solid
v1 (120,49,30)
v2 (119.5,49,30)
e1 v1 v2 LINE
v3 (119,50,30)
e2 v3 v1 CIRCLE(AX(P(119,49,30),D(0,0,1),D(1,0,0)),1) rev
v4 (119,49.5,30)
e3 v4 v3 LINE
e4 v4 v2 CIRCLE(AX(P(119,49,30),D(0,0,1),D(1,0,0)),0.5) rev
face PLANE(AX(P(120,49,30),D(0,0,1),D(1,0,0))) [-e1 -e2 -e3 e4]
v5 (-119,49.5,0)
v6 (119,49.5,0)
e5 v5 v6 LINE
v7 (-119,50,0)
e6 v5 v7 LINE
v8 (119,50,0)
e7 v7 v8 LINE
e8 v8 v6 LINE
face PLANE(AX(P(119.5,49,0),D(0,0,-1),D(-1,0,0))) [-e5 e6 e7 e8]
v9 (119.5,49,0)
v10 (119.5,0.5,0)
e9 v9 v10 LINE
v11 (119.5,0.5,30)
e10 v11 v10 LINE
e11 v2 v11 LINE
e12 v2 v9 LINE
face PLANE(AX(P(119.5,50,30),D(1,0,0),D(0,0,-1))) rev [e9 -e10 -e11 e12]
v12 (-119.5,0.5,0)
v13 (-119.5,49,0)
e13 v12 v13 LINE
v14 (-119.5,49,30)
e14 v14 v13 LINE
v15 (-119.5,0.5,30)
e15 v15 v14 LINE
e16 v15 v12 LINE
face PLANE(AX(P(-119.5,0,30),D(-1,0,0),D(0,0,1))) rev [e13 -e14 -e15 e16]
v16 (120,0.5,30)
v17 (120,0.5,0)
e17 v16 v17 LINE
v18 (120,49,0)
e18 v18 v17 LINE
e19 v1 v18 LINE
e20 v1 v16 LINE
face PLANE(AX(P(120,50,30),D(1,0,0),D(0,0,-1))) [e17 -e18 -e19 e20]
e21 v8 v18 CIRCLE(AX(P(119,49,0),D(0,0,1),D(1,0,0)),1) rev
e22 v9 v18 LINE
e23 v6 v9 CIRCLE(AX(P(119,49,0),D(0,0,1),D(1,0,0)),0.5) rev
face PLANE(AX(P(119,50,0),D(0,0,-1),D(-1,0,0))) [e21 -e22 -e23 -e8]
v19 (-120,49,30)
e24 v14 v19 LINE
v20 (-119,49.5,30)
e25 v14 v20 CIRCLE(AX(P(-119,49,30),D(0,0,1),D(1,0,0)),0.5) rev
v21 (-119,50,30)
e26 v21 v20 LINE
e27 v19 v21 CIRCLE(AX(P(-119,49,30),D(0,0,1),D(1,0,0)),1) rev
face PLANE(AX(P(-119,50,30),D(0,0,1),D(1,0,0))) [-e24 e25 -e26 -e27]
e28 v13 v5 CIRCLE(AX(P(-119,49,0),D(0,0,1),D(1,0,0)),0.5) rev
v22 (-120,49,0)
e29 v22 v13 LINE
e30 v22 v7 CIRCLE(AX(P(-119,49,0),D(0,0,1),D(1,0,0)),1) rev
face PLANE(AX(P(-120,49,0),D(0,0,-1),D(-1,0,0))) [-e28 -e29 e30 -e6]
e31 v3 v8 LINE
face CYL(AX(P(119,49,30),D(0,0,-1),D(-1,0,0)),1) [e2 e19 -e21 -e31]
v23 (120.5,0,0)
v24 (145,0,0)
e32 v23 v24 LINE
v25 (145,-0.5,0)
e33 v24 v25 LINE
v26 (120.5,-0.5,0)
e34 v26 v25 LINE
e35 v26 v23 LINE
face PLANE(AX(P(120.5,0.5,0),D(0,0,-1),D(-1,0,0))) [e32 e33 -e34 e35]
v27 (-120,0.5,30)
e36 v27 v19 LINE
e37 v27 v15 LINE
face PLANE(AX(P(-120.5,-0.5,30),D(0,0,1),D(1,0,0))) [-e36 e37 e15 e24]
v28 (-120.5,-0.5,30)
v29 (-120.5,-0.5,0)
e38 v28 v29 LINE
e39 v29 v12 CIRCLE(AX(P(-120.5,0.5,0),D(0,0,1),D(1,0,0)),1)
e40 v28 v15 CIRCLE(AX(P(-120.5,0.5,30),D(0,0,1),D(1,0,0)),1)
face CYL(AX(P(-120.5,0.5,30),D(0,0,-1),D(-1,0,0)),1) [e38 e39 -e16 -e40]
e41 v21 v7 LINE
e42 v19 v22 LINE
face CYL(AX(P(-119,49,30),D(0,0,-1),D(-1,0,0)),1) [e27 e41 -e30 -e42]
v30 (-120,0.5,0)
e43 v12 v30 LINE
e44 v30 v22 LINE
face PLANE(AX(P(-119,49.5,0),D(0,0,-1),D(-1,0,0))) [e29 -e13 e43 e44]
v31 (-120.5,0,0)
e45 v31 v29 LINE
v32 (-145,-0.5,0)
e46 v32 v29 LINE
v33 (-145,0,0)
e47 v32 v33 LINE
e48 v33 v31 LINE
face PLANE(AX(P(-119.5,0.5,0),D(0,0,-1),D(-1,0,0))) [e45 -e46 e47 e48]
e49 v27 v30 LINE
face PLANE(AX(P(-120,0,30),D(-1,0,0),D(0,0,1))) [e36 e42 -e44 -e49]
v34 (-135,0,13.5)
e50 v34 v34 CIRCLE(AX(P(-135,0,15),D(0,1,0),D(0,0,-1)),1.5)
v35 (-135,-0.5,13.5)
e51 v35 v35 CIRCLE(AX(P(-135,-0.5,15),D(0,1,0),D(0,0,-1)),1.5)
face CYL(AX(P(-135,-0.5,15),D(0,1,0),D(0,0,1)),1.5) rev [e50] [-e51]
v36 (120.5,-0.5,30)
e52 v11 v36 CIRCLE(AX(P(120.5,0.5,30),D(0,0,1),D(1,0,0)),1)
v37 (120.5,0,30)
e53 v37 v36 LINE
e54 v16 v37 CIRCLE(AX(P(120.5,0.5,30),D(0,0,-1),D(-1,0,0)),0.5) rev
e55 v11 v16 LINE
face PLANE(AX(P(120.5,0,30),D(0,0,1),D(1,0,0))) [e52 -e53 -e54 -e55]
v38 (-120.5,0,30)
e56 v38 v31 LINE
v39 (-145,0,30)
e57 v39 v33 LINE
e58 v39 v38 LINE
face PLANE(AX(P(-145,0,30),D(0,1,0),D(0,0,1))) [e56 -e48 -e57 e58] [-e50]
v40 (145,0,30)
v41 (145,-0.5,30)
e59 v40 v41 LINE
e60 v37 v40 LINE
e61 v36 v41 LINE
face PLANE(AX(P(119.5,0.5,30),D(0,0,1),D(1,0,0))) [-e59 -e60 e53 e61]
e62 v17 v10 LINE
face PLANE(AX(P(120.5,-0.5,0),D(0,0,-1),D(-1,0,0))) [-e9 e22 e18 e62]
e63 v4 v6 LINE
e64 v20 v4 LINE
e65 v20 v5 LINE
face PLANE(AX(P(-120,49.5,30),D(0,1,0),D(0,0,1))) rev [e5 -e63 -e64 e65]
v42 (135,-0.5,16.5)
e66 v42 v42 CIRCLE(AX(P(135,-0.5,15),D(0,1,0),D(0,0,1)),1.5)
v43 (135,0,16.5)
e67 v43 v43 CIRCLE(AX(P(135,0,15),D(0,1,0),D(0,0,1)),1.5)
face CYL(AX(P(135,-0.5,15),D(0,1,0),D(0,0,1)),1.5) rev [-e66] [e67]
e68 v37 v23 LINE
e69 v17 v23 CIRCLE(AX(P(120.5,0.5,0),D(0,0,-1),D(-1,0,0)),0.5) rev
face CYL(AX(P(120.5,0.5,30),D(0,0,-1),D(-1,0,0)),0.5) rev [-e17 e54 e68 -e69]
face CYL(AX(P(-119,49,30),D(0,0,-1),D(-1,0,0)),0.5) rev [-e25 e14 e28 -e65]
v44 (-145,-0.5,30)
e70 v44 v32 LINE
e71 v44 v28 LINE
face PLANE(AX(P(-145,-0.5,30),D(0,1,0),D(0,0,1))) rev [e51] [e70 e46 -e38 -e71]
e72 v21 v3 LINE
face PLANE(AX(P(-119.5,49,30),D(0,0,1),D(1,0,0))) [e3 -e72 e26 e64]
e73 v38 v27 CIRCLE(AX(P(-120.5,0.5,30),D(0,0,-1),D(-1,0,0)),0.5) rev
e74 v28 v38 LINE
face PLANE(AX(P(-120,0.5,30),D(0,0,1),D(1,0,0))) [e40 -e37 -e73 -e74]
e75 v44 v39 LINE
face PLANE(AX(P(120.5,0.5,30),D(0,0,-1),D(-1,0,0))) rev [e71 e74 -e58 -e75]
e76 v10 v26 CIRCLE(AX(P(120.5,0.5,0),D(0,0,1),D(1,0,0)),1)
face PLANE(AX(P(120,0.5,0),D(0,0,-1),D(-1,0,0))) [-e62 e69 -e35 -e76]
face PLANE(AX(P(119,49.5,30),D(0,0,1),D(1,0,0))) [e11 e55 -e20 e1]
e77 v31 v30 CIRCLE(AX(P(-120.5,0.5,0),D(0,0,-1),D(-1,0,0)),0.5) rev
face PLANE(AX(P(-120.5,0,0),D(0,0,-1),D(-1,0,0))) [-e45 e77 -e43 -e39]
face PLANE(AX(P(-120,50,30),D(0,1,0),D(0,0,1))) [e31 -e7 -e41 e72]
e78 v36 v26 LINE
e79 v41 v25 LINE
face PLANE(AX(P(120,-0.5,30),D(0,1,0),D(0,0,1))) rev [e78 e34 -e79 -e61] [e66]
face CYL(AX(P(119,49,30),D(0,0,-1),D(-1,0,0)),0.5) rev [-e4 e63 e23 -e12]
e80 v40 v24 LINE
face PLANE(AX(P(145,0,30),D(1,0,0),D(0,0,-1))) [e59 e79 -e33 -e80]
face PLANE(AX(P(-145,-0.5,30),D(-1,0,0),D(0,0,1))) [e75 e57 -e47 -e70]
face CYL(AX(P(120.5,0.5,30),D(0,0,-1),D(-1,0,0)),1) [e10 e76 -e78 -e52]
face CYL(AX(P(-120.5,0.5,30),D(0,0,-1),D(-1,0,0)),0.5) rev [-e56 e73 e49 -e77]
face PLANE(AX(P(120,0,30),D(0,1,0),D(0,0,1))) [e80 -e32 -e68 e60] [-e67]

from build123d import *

# Parameters (mm, degrees)
BASE_FLANGE1_DEPTH = 30
SKETCH6_R          = 1.5
CUT_EXTRUDE1_DEPTH = 10


# Sheet-metal steps are written as plain solids
with BuildPart() as part:
    # Sketch1 → Base-Flange1 (new body)
    with BuildSketch(Plane.XY):
        with BuildLine():
            Line((-145, 0), (-120.5, 0))
            ThreePointArc((-120.5, 0), (-120.146446609, 0.146446609), (-120, 0.5))
            Line((-120, 0.5), (-120, 49))
            ThreePointArc((-120, 49), (-119.707106781, 49.707106781), (-119, 50))
            Line((-119, 50), (119, 50))
            ThreePointArc((119, 50), (119.707106781, 49.707106781), (120, 49))
            Line((120, 49), (120, 0.5))
            ThreePointArc((120, 0.5), (120.146446609, 0.146446609), (120.5, 0))
            Line((120.5, 0), (145, 0))
            Line((145, 0), (145, -0.5))
            Line((145, -0.5), (120.5, -0.5))
            ThreePointArc((120.5, -0.5), (119.792893219, -0.207106781), (119.5, 0.5))
            Line((119.5, 0.5), (119.5, 49))
            ThreePointArc((119.5, 49), (119.353553391, 49.353553391), (119, 49.5))
            Line((119, 49.5), (-119, 49.5))
            ThreePointArc((-119, 49.5), (-119.353553391, 49.353553391), (-119.5, 49))
            Line((-119.5, 49), (-119.5, 0.5))
            ThreePointArc((-119.5, 0.5), (-119.792893219, -0.207106781), (-120.5, -0.5))
            Line((-120.5, -0.5), (-145, -0.5))
            Line((-145, -0.5), (-145, 0))
        make_face()
    extrude(amount=BASE_FLANGE1_DEPTH)

    # Sketch6 → Cut-Extrude1 (cut)
    with BuildSketch(Plane(origin=(0, 0, 0), x_dir=(1, 0, 0), z_dir=(0, 1, 0))):
        with Locations(Location((135, -15, 0), (0, 0, 270))):
            Circle(SKETCH6_R)
        with Locations(Location((-135, -15, 0), (0, 0, 90))):
            Circle(SKETCH6_R)
    extrude(amount=-CUT_EXTRUDE1_DEPTH, mode=Mode.SUBTRACT)


solid = part.part
